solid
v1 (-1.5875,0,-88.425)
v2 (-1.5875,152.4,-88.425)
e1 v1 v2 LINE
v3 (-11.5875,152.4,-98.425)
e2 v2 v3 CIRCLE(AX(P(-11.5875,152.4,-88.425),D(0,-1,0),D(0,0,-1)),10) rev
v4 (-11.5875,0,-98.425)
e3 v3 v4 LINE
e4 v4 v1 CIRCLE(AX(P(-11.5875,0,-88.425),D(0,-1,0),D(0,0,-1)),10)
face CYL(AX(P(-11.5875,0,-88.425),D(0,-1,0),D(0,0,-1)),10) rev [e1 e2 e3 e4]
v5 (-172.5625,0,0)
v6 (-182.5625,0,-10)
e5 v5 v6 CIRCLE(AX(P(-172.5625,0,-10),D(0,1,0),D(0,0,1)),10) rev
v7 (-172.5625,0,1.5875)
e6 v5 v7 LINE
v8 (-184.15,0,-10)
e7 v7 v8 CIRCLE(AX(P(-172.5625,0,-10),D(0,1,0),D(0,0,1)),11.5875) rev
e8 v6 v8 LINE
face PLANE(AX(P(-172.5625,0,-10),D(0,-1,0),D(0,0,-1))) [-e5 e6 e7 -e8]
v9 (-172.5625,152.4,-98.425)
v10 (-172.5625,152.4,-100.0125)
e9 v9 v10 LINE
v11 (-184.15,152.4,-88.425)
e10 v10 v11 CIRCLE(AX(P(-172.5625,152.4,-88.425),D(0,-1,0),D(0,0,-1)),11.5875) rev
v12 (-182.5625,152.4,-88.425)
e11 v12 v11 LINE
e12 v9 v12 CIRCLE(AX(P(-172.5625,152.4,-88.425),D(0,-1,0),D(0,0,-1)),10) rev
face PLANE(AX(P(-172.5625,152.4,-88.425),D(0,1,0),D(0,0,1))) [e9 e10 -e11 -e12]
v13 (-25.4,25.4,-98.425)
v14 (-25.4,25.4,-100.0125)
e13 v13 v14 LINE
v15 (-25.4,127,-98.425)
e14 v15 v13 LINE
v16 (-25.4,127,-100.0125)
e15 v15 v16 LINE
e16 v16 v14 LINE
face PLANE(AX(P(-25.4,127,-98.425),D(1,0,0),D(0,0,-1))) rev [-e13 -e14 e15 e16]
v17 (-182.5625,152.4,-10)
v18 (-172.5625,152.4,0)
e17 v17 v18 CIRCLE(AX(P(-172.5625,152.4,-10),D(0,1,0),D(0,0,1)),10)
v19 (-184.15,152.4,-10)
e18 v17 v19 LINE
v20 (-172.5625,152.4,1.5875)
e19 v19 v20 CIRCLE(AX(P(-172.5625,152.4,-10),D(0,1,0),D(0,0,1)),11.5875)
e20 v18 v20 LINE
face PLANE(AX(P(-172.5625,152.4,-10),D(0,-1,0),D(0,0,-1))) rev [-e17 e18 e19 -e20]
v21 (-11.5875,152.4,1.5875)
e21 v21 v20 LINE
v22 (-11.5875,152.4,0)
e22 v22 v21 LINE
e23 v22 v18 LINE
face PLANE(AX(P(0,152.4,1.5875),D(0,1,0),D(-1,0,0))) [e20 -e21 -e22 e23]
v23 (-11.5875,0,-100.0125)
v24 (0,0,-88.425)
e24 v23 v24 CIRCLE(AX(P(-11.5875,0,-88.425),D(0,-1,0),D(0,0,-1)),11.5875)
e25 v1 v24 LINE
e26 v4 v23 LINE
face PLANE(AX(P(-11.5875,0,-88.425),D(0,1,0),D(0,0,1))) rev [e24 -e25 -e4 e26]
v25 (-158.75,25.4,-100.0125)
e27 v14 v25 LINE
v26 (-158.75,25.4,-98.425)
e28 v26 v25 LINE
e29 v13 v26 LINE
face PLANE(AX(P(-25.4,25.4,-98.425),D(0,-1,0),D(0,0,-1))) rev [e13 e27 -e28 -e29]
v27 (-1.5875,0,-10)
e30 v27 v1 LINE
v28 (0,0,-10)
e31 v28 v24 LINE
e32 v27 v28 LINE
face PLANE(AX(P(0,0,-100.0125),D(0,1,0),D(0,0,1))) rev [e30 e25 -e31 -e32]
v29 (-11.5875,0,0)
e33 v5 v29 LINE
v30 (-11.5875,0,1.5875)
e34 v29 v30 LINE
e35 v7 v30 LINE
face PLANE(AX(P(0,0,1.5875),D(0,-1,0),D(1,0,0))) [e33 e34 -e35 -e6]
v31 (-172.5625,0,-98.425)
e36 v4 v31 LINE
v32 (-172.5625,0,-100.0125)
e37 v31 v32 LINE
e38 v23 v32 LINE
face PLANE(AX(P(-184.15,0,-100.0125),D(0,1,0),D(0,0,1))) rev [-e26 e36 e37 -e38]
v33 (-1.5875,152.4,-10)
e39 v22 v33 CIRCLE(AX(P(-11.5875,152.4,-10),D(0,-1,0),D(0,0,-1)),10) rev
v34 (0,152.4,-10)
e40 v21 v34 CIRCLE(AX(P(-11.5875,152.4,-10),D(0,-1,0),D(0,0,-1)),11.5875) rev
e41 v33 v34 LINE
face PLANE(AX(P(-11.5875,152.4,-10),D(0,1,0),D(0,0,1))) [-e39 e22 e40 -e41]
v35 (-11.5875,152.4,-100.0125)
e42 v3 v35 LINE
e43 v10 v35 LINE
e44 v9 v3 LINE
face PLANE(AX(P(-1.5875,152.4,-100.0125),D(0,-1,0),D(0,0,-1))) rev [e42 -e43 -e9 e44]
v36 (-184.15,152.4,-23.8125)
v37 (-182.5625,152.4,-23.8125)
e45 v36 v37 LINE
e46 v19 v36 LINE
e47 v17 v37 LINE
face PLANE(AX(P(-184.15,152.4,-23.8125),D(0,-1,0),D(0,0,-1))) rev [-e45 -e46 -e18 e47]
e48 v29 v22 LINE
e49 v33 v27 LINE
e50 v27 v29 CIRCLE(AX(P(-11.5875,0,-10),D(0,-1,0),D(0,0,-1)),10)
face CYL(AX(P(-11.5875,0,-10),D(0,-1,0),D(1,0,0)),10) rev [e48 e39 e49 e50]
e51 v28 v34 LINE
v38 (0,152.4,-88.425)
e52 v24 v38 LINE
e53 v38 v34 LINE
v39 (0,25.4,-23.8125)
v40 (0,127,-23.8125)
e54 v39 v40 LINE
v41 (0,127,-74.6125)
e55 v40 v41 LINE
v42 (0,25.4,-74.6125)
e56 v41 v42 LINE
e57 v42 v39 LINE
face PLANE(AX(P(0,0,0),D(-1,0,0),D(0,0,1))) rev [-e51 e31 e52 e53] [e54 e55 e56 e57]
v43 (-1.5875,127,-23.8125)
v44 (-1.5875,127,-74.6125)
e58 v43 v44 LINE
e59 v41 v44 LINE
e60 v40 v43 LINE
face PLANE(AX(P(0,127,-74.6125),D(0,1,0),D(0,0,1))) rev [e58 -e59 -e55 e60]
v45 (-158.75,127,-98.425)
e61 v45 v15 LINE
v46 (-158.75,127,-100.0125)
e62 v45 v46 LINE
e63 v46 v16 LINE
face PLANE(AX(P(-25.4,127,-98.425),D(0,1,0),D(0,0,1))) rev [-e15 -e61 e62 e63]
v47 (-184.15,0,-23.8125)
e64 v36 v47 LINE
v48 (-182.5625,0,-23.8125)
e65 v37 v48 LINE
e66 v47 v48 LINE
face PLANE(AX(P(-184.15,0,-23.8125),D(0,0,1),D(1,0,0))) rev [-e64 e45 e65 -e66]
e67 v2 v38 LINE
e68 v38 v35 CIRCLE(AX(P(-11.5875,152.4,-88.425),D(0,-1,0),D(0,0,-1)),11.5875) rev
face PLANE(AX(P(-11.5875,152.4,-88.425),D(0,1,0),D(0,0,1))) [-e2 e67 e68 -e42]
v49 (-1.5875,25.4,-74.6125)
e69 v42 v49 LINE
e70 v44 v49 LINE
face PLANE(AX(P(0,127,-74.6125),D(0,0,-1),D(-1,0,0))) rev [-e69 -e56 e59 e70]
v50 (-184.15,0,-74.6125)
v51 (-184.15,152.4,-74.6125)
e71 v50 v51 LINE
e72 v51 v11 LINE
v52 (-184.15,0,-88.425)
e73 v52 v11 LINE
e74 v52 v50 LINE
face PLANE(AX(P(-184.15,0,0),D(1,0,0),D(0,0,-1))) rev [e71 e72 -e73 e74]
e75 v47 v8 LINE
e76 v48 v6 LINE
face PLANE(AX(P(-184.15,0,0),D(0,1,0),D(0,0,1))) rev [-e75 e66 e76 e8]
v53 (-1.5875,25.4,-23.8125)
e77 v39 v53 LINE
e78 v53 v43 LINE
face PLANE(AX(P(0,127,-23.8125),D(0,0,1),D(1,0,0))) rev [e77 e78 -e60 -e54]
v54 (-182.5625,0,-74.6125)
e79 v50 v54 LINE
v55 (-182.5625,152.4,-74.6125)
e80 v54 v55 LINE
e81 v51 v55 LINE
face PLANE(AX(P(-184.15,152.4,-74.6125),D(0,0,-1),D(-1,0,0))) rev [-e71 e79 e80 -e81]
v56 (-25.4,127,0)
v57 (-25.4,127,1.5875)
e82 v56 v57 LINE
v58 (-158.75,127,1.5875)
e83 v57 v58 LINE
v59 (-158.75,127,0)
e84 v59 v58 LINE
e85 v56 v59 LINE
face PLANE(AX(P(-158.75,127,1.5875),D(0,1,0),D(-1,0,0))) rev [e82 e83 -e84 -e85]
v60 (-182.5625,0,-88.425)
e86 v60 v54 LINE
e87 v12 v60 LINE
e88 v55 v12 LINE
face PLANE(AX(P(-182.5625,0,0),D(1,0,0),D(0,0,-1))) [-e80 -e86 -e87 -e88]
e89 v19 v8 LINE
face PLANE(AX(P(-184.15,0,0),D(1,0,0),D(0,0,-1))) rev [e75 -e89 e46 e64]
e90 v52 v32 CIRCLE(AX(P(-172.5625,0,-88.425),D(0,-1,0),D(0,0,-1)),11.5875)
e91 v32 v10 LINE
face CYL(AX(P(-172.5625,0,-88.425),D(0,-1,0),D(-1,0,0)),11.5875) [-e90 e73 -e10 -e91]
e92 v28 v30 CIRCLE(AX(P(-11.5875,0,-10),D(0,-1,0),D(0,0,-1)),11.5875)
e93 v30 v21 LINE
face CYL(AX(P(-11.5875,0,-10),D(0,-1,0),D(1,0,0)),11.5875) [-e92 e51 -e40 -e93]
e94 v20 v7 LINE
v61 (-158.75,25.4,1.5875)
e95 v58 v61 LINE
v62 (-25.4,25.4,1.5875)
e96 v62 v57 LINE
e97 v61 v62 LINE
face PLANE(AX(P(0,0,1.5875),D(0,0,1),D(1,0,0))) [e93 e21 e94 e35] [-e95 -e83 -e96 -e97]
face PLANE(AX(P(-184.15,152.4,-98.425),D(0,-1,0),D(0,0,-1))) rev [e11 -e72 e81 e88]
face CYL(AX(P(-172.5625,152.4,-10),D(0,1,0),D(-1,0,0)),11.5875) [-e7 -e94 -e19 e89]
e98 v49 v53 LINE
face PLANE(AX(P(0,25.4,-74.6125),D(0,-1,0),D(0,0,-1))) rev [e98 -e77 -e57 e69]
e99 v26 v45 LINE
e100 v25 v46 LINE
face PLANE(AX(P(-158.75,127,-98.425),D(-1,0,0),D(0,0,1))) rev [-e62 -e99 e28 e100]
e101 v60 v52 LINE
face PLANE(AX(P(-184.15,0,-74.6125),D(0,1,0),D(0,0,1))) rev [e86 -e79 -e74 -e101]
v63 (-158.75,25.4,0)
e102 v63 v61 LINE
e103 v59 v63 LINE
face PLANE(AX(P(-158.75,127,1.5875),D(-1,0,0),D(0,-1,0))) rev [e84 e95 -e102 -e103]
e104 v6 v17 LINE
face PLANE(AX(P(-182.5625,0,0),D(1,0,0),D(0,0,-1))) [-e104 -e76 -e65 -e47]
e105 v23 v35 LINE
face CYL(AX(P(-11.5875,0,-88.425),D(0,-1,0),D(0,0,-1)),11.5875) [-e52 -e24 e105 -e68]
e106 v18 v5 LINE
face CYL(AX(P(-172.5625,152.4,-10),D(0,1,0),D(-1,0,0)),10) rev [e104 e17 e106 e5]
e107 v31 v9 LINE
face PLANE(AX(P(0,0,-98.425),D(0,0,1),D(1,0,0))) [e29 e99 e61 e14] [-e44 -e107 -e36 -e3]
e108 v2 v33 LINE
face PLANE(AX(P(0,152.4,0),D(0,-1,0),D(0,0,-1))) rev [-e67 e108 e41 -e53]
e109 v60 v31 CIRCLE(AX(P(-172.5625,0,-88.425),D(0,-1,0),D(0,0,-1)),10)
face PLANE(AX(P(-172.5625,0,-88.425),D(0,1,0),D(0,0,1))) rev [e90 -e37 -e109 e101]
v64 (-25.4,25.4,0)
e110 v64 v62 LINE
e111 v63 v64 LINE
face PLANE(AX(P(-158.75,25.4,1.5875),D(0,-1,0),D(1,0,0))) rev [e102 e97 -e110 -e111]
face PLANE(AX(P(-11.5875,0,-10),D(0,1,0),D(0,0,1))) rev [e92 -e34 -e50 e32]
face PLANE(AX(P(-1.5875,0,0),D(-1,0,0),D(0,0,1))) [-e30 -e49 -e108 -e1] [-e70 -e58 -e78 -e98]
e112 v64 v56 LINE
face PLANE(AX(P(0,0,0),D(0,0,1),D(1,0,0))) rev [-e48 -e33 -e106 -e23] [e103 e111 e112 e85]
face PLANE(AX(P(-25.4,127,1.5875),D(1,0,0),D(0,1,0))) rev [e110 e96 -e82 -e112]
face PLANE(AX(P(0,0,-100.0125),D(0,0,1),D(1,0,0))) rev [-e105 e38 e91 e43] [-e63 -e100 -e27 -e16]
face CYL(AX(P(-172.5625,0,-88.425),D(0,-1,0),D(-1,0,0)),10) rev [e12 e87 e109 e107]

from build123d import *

# Parameters (mm, degrees)
SKETCH1_W                    = 184.15
SKETCH1_H                    = 152.4
SKETCH1_W_2                  = 133.35
SKETCH1_H_2                  = 101.6
BOSS_EXTRUDE1_DEPTH          = 1.5875
EDGE_FLANGE1_STRIP_W         = 26.35
EDGE_FLANGE1_STRIP_H         = 1.5875
EDGE_FLANGE1_STRIP_CUT_DEPTH = 152.4
EDGE_FLANGE1_DEPTH           = 152.4
EDGE_FLANGE2_STRIP_W         = 26.35
EDGE_FLANGE2_STRIP_H         = 1.5875
EDGE_FLANGE2_STRIP_CUT_DEPTH = 152.4
EDGE_FLANGE2_DEPTH           = 152.4
SKETCH16_W                   = 133.35
SKETCH16_H                   = 101.6
CUT_EXTRUDE1_DEPTH           = 1.5875
SKETCH17_W                   = 50.8
SKETCH17_H                   = 101.6
CUT_EXTRUDE2_DEPTH           = 1.5875
EDGE_FLANGE3_STRIP_W         = 26.35
EDGE_FLANGE3_STRIP_H         = 1.5875
EDGE_FLANGE3_STRIP_CUT_DEPTH = 152.4
EDGE_FLANGE3_DEPTH           = 152.4
EDGE_FLANGE4_STRIP_W         = 26.35
EDGE_FLANGE4_STRIP_H         = 1.5875
EDGE_FLANGE4_STRIP_CUT_DEPTH = 152.4
EDGE_FLANGE4_DEPTH           = 152.4


# Sheet-metal steps are written as plain solids
with BuildPart() as part:
    # Sketch1 → Boss-Extrude1 (new body)
    with BuildSketch(Plane.XY):
        with Locations((-92.075, 76.2)):
            Rectangle(SKETCH1_W, SKETCH1_H)
        with Locations((-92.075, 76.2)):
            Rectangle(SKETCH1_W_2, SKETCH1_H_2, mode=Mode.SUBTRACT)
    extrude(amount=BOSS_EXTRUDE1_DEPTH)

    # Edge-Flange1 strip (across the edge) → Edge-Flange1 strip cut (cut)
    with BuildSketch(Plane(origin=(0, 152.4, 0), x_dir=(-1, 0, 0), z_dir=(0, -1, 0))):
        with Locations((-1.5875, -0.79375)):
            Rectangle(EDGE_FLANGE1_STRIP_W, EDGE_FLANGE1_STRIP_H)
    extrude(amount=EDGE_FLANGE1_STRIP_CUT_DEPTH, mode=Mode.SUBTRACT)

    # Edge-Flange1 section (across the edge) → Edge-Flange1 (add)
    with BuildSketch(Plane(origin=(0, 152.4, 0), x_dir=(-1, 0, 0), z_dir=(0, -1, 0))):
        with BuildLine():
            Line((0, 10), (0, 100.0125))
            Line((0, 100.0125), (1.5875, 100.0125))
            Line((1.5875, 100.0125), (1.5875, 10))
            ThreePointArc((1.5875, 10), (4.516432188, 2.928932188), (11.5875, 0))
            Line((11.5875, 0), (11.5875, -1.5875))
            ThreePointArc((11.5875, -1.5875), (3.393900173, 1.806400173), (0, 10))
        make_face()
    extrude(amount=EDGE_FLANGE1_DEPTH)

    # Edge-Flange2 strip (across the edge) → Edge-Flange2 strip cut (cut)
    with BuildSketch(Plane(origin=(-1.5875, 152.4, -100.0125), x_dir=(0, 0, 1), z_dir=(0, -1, 0))):
        with Locations((-1.5875, -0.79375)):
            Rectangle(EDGE_FLANGE2_STRIP_W, EDGE_FLANGE2_STRIP_H)
    extrude(amount=EDGE_FLANGE2_STRIP_CUT_DEPTH, mode=Mode.SUBTRACT)

    # Edge-Flange2 section (across the edge) → Edge-Flange2 (add)
    with BuildSketch(Plane(origin=(-1.5875, 152.4, -100.0125), x_dir=(0, 0, 1), z_dir=(0, -1, 0))):
        with BuildLine():
            Line((0, 10), (0, 182.5625))
            Line((0, 182.5625), (1.5875, 182.5625))
            Line((1.5875, 182.5625), (1.5875, 10))
            ThreePointArc((1.5875, 10), (4.516432188, 2.928932188), (11.5875, 0))
            Line((11.5875, 0), (11.5875, -1.5875))
            ThreePointArc((11.5875, -1.5875), (3.393900173, 1.806400173), (0, 10))
        make_face()
    extrude(amount=EDGE_FLANGE2_DEPTH)

    # Sketch16 → Cut-Extrude1 (cut)
    with BuildSketch(Plane(origin=(0, 0, -100.0125), x_dir=(-1, 0, 0), z_dir=(0, 0, -1))):
        with Locations((92.075, 76.2)):
            Rectangle(SKETCH16_W, SKETCH16_H)
    extrude(amount=-CUT_EXTRUDE1_DEPTH, mode=Mode.SUBTRACT)

    # Sketch17 → Cut-Extrude2 (cut)
    with BuildSketch(Plane.ZY.offset(1.5875)):
        with Locations((-49.2125, 76.2)):
            Rectangle(SKETCH17_W, SKETCH17_H)
    extrude(amount=-CUT_EXTRUDE2_DEPTH, mode=Mode.SUBTRACT)

    # Edge-Flange3 strip (across the edge) → Edge-Flange3 strip cut (cut)
    with BuildSketch(Plane(origin=(-184.15, 152.4, -98.425), x_dir=(1, 0, 0), z_dir=(0, -1, 0))):
        with Locations((-1.5875, -0.79375)):
            Rectangle(EDGE_FLANGE3_STRIP_W, EDGE_FLANGE3_STRIP_H)
    extrude(amount=EDGE_FLANGE3_STRIP_CUT_DEPTH, mode=Mode.SUBTRACT)

    # Edge-Flange3 section (across the edge) → Edge-Flange3 (add)
    with BuildSketch(Plane(origin=(-184.15, 152.4, -98.425), x_dir=(1, 0, 0), z_dir=(0, -1, 0))):
        with BuildLine():
            Line((0, 10), (0, 23.8125))
            Line((0, 23.8125), (1.5875, 23.8125))
            Line((1.5875, 23.8125), (1.5875, 10))
            ThreePointArc((1.5875, 10), (4.516432188, 2.928932188), (11.5875, 0))
            Line((11.5875, 0), (11.5875, -1.5875))
            ThreePointArc((11.5875, -1.5875), (3.393900173, 1.806400173), (0, 10))
        make_face()
    extrude(amount=EDGE_FLANGE3_DEPTH)

    # Edge-Flange4 strip (across the edge) → Edge-Flange4 strip cut (cut)
    with BuildSketch(Plane(origin=(-184.15, 0, 0), x_dir=(1, 0, 0), z_dir=(0, 1, 0))):
        with Locations((-1.5875, -0.79375)):
            Rectangle(EDGE_FLANGE4_STRIP_W, EDGE_FLANGE4_STRIP_H)
    extrude(amount=EDGE_FLANGE4_STRIP_CUT_DEPTH, mode=Mode.SUBTRACT)

    # Edge-Flange4 section (across the edge) → Edge-Flange4 (add)
    with BuildSketch(Plane(origin=(-184.15, 0, 0), x_dir=(1, 0, 0), z_dir=(0, 1, 0))):
        with BuildLine():
            Line((0, 10), (0, 23.8125))
            Line((0, 23.8125), (1.5875, 23.8125))
            Line((1.5875, 23.8125), (1.5875, 10))
            ThreePointArc((1.5875, 10), (4.516432188, 2.928932188), (11.5875, 0))
            Line((11.5875, 0), (11.5875, -1.5875))
            ThreePointArc((11.5875, -1.5875), (3.393900173, 1.806400173), (0, 10))
        make_face()
    extrude(amount=EDGE_FLANGE4_DEPTH)


solid = part.part
